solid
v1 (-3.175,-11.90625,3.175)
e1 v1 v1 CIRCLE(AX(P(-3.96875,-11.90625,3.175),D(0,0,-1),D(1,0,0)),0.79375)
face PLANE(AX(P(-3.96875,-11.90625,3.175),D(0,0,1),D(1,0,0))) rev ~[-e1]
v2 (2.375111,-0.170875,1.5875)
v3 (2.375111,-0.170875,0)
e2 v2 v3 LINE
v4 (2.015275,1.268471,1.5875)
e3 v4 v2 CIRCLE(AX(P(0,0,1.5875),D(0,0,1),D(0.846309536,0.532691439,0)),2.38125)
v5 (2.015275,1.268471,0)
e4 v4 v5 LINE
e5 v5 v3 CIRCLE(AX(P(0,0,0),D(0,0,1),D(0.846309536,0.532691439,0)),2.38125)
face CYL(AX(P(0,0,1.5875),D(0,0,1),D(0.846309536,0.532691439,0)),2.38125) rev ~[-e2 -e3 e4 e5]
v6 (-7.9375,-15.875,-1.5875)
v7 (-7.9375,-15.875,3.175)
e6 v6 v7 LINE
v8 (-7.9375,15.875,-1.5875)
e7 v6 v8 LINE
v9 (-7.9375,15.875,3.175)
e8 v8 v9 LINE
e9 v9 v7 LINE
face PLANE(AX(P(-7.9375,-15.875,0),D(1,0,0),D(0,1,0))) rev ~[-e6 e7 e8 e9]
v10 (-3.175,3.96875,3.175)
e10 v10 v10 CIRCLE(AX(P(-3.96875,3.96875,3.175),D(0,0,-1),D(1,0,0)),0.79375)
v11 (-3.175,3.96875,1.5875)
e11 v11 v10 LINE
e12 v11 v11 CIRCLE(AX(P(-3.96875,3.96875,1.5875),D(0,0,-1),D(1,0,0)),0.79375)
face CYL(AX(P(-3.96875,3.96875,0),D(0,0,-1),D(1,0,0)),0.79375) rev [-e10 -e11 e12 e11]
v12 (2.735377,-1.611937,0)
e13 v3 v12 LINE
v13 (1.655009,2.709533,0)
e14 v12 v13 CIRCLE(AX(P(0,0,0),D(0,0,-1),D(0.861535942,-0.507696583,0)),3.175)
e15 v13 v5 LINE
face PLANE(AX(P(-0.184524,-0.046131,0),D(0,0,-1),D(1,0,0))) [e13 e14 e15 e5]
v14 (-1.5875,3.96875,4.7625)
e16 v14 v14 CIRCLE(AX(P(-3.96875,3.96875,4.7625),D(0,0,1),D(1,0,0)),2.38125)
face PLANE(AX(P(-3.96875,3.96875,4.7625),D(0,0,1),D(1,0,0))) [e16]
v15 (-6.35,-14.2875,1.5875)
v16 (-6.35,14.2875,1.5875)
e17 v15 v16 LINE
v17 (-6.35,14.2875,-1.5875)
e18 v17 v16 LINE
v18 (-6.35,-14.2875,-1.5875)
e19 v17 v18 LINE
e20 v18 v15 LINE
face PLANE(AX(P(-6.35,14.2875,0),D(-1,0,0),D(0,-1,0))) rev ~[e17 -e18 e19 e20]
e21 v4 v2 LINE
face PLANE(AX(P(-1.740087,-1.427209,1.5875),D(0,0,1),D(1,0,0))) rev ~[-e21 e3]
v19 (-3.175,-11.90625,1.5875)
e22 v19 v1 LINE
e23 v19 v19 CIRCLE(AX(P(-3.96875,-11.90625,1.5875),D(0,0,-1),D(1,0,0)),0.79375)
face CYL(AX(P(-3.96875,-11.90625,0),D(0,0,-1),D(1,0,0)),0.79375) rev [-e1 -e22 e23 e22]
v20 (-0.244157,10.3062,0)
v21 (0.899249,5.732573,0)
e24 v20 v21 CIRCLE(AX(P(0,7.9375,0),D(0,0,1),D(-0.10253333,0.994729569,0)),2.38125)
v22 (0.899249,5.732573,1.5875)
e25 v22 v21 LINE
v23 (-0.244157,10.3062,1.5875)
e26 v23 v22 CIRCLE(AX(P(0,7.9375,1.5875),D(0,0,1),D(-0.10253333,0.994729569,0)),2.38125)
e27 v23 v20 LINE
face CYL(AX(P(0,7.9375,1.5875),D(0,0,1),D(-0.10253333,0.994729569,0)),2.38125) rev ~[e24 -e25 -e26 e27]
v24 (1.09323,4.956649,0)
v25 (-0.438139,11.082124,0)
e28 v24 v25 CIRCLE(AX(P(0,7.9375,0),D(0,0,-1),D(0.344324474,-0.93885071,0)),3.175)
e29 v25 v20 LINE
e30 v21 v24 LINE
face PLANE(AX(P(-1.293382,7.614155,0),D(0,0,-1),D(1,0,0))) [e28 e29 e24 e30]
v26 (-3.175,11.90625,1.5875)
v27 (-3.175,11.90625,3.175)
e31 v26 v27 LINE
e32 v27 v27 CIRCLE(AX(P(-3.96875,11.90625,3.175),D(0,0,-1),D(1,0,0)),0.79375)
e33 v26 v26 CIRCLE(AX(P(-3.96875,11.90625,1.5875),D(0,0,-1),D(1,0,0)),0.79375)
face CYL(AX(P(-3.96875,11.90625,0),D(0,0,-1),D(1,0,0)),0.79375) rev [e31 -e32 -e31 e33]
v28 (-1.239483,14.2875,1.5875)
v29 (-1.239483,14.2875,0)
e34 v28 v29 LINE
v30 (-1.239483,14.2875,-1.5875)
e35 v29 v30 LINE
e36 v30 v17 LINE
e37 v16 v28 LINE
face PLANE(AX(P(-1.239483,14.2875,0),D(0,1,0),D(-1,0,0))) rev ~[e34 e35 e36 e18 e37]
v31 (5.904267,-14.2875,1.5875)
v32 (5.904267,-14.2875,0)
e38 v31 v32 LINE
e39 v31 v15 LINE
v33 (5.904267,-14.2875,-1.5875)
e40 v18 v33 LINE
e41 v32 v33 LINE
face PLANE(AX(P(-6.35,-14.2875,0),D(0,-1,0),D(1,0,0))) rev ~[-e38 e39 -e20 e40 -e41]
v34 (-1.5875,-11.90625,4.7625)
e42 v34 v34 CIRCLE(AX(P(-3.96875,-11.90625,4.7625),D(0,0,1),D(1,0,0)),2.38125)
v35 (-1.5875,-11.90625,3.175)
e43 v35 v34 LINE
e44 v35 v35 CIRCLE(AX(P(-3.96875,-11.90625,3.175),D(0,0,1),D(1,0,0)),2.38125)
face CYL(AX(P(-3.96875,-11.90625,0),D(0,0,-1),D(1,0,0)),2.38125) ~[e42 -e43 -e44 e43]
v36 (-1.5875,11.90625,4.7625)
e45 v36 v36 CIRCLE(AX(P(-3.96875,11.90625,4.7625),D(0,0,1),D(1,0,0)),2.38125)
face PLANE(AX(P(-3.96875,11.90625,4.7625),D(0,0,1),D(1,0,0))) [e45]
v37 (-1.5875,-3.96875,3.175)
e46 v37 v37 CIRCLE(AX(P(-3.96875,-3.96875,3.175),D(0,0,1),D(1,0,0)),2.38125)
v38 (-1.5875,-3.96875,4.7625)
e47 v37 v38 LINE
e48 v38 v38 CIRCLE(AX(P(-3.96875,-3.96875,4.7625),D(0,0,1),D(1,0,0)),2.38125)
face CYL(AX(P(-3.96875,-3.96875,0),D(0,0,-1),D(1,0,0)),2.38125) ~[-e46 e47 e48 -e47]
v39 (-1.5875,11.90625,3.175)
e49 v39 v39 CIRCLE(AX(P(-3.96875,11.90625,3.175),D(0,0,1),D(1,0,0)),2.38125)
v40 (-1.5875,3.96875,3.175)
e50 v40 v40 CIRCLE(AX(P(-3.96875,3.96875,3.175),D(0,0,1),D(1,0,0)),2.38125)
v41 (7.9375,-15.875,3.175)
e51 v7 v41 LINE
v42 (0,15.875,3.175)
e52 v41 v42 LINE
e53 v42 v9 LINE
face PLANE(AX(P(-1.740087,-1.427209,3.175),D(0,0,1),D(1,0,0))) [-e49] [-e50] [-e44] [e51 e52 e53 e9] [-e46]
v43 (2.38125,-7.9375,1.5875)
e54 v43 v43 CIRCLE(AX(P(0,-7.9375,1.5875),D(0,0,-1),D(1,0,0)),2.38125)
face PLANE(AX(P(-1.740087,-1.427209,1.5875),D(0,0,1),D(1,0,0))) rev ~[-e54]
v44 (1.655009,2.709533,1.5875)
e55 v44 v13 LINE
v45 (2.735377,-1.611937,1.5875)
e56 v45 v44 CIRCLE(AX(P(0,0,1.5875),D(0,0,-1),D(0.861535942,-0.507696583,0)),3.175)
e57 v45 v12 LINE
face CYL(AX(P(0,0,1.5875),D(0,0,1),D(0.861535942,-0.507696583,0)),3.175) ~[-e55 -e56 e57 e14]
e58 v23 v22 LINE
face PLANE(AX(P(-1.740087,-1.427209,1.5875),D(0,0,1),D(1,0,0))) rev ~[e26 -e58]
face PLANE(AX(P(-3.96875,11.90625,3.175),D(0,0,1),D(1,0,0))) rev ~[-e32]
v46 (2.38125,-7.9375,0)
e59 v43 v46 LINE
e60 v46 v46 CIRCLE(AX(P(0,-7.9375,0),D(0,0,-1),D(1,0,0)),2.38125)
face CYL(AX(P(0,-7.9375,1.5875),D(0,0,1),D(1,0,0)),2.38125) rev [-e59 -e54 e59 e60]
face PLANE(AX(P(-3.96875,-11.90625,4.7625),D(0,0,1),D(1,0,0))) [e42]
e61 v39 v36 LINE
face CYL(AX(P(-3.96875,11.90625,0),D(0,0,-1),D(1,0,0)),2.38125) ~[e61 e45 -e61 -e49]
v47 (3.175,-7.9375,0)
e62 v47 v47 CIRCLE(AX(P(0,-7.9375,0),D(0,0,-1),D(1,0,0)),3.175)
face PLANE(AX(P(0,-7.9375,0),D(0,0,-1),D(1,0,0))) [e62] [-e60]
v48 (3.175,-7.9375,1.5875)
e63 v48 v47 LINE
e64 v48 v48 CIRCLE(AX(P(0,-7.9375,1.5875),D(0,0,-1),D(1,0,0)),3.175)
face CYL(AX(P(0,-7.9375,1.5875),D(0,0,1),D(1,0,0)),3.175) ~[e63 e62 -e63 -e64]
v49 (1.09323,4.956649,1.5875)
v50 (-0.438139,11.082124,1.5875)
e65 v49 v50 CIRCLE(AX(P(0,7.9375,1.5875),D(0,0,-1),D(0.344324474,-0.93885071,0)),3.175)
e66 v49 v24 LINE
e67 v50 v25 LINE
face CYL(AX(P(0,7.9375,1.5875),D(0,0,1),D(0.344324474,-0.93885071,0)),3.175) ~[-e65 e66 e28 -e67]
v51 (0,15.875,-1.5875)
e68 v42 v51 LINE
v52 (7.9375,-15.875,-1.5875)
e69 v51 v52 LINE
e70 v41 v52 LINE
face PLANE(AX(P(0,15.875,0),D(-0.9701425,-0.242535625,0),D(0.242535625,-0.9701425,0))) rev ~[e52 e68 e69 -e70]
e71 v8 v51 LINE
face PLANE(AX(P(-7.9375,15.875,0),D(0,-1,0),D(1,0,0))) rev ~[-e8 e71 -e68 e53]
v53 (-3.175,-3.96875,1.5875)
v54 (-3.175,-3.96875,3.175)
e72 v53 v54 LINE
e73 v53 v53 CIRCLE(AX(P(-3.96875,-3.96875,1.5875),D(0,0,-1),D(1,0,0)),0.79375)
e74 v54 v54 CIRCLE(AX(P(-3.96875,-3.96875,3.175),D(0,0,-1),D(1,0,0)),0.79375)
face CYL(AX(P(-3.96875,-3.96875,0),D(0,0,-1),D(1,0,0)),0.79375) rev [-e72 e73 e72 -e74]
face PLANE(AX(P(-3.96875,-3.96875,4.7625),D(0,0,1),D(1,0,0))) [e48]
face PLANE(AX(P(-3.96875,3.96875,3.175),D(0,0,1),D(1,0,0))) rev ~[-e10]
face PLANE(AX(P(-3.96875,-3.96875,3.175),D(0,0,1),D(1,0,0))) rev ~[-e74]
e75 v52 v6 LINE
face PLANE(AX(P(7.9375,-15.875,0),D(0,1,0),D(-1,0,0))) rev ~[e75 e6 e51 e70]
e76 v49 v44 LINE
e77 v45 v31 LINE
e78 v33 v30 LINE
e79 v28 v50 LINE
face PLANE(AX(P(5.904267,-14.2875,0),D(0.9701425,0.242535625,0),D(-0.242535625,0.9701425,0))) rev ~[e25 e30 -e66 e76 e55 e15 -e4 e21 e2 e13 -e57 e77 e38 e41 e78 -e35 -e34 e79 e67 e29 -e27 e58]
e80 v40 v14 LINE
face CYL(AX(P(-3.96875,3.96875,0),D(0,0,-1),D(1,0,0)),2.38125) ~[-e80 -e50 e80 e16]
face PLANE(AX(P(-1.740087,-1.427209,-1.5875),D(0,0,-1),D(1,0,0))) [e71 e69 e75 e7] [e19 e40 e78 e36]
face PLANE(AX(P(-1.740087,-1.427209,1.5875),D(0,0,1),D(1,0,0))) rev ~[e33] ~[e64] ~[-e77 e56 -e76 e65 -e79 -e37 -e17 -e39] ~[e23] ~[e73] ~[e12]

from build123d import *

# Parameters (mm, degrees)
F0_R     = 2.38125
F1_DEPTH = 3.175
F2_DEPTH = 4.7625
F3_T     = -1.5875
F4_R     = 3.175
F4_R_2   = 2.38125
F5_DEPTH = 1.5875


with BuildPart() as f1:
    # F0 (on Top) → F1 (new body)
    with BuildSketch(Plane.XY):
        Polygon((0, 15.875), (-7.9375, 15.875), (-7.9375, -15.875), (7.9375, -15.875), align=None)
        with Locations((-3.96875, -11.90625)):
            Circle(F0_R, mode=Mode.SUBTRACT)
        with Locations((-3.96875, -3.96875)):
            Circle(F0_R, mode=Mode.SUBTRACT)
        with Locations((-3.96875, 3.96875)):
            Circle(F0_R, mode=Mode.SUBTRACT)
        with Locations((-3.96875, 11.90625)):
            Circle(F0_R, mode=Mode.SUBTRACT)
    extrude(amount=F1_DEPTH)

    # F0 (on Top) → F2 (join)
    with BuildSketch(Plane.XY):
        with Locations((-3.96875, 11.90625)):
            Circle(F0_R)
        with Locations((-3.96875, 3.96875)):
            Circle(F0_R)
        with Locations((-3.96875, -3.96875)):
            Circle(F0_R)
        with Locations((-3.96875, -11.90625)):
            Circle(F0_R)
    extrude(amount=F2_DEPTH)

    # F3
    f3_openings = [f1.faces().sort_by_distance(p)[0] for p in [
        (-1.763889, -1.763889, 0),
    ]]
    offset(amount=F3_T, openings=f3_openings, kind=Kind.INTERSECTION)

    # F2_face (on face) + F4 (on face) → F5 (join)
    with BuildSketch(Plane(origin=(-1.7638745265, -1.3908157983, 0), x_dir=(1, 0, 0), z_dir=(0, 0, -1))):
        Polygon((-6.1736254735, -17.2658157983), (1.7638745265, -17.2658157983), (9.7013745265, 14.4841842017), (-6.1736254735, 14.4841842017), align=None)
        Polygon((0.5243919814, -15.6783157983), (-4.5861254735, -15.6783157983), (-4.5861254735, 12.8966842017), (7.6681419814, 12.8966842017), align=None, mode=Mode.SUBTRACT)
    with BuildSketch(Plane(origin=(0, 0, 1.5875), x_dir=(1, 0, 0), z_dir=(0, 0, -1))):
        with BuildLine():
            Line((0.8992491716, -5.7325731328), (1.0932302062, -4.9566489946))
            ThreePointArc((1.0932302062, -4.9566489946), (-3.080202438, -7.1674493905), (-0.4381385265, -11.0821239253))
            Line((-0.4381385265, -11.0821239253), (-0.244157492, -10.3061997871))
            ThreePointArc((-0.244157492, -10.3061997871), (-2.3101518285, -7.3599620429), (0.8992491716, -5.7325731328))
        make_face()
        with BuildLine():
            ThreePointArc((2.7353766172, 1.6119366495), (-3.080202438, 0.7700506095), (1.6550091801, -2.7095330988))
            Line((1.6550091801, -2.7095330988), (2.0152745824, -1.2684714896))
            ThreePointArc((2.0152745824, -1.2684714896), (-2.3101518285, 0.5775379571), (2.3751112149, 0.1708750402))
            Line((2.3751112149, 0.1708750402), (2.7353766172, 1.6119366495))
        make_face()
        with Locations((0, 7.9375)):
            Circle(F4_R)
        with Locations((0, 7.9375)):
            Circle(F4_R_2, mode=Mode.SUBTRACT)
    extrude(amount=F5_DEPTH)


solid = f1.part
